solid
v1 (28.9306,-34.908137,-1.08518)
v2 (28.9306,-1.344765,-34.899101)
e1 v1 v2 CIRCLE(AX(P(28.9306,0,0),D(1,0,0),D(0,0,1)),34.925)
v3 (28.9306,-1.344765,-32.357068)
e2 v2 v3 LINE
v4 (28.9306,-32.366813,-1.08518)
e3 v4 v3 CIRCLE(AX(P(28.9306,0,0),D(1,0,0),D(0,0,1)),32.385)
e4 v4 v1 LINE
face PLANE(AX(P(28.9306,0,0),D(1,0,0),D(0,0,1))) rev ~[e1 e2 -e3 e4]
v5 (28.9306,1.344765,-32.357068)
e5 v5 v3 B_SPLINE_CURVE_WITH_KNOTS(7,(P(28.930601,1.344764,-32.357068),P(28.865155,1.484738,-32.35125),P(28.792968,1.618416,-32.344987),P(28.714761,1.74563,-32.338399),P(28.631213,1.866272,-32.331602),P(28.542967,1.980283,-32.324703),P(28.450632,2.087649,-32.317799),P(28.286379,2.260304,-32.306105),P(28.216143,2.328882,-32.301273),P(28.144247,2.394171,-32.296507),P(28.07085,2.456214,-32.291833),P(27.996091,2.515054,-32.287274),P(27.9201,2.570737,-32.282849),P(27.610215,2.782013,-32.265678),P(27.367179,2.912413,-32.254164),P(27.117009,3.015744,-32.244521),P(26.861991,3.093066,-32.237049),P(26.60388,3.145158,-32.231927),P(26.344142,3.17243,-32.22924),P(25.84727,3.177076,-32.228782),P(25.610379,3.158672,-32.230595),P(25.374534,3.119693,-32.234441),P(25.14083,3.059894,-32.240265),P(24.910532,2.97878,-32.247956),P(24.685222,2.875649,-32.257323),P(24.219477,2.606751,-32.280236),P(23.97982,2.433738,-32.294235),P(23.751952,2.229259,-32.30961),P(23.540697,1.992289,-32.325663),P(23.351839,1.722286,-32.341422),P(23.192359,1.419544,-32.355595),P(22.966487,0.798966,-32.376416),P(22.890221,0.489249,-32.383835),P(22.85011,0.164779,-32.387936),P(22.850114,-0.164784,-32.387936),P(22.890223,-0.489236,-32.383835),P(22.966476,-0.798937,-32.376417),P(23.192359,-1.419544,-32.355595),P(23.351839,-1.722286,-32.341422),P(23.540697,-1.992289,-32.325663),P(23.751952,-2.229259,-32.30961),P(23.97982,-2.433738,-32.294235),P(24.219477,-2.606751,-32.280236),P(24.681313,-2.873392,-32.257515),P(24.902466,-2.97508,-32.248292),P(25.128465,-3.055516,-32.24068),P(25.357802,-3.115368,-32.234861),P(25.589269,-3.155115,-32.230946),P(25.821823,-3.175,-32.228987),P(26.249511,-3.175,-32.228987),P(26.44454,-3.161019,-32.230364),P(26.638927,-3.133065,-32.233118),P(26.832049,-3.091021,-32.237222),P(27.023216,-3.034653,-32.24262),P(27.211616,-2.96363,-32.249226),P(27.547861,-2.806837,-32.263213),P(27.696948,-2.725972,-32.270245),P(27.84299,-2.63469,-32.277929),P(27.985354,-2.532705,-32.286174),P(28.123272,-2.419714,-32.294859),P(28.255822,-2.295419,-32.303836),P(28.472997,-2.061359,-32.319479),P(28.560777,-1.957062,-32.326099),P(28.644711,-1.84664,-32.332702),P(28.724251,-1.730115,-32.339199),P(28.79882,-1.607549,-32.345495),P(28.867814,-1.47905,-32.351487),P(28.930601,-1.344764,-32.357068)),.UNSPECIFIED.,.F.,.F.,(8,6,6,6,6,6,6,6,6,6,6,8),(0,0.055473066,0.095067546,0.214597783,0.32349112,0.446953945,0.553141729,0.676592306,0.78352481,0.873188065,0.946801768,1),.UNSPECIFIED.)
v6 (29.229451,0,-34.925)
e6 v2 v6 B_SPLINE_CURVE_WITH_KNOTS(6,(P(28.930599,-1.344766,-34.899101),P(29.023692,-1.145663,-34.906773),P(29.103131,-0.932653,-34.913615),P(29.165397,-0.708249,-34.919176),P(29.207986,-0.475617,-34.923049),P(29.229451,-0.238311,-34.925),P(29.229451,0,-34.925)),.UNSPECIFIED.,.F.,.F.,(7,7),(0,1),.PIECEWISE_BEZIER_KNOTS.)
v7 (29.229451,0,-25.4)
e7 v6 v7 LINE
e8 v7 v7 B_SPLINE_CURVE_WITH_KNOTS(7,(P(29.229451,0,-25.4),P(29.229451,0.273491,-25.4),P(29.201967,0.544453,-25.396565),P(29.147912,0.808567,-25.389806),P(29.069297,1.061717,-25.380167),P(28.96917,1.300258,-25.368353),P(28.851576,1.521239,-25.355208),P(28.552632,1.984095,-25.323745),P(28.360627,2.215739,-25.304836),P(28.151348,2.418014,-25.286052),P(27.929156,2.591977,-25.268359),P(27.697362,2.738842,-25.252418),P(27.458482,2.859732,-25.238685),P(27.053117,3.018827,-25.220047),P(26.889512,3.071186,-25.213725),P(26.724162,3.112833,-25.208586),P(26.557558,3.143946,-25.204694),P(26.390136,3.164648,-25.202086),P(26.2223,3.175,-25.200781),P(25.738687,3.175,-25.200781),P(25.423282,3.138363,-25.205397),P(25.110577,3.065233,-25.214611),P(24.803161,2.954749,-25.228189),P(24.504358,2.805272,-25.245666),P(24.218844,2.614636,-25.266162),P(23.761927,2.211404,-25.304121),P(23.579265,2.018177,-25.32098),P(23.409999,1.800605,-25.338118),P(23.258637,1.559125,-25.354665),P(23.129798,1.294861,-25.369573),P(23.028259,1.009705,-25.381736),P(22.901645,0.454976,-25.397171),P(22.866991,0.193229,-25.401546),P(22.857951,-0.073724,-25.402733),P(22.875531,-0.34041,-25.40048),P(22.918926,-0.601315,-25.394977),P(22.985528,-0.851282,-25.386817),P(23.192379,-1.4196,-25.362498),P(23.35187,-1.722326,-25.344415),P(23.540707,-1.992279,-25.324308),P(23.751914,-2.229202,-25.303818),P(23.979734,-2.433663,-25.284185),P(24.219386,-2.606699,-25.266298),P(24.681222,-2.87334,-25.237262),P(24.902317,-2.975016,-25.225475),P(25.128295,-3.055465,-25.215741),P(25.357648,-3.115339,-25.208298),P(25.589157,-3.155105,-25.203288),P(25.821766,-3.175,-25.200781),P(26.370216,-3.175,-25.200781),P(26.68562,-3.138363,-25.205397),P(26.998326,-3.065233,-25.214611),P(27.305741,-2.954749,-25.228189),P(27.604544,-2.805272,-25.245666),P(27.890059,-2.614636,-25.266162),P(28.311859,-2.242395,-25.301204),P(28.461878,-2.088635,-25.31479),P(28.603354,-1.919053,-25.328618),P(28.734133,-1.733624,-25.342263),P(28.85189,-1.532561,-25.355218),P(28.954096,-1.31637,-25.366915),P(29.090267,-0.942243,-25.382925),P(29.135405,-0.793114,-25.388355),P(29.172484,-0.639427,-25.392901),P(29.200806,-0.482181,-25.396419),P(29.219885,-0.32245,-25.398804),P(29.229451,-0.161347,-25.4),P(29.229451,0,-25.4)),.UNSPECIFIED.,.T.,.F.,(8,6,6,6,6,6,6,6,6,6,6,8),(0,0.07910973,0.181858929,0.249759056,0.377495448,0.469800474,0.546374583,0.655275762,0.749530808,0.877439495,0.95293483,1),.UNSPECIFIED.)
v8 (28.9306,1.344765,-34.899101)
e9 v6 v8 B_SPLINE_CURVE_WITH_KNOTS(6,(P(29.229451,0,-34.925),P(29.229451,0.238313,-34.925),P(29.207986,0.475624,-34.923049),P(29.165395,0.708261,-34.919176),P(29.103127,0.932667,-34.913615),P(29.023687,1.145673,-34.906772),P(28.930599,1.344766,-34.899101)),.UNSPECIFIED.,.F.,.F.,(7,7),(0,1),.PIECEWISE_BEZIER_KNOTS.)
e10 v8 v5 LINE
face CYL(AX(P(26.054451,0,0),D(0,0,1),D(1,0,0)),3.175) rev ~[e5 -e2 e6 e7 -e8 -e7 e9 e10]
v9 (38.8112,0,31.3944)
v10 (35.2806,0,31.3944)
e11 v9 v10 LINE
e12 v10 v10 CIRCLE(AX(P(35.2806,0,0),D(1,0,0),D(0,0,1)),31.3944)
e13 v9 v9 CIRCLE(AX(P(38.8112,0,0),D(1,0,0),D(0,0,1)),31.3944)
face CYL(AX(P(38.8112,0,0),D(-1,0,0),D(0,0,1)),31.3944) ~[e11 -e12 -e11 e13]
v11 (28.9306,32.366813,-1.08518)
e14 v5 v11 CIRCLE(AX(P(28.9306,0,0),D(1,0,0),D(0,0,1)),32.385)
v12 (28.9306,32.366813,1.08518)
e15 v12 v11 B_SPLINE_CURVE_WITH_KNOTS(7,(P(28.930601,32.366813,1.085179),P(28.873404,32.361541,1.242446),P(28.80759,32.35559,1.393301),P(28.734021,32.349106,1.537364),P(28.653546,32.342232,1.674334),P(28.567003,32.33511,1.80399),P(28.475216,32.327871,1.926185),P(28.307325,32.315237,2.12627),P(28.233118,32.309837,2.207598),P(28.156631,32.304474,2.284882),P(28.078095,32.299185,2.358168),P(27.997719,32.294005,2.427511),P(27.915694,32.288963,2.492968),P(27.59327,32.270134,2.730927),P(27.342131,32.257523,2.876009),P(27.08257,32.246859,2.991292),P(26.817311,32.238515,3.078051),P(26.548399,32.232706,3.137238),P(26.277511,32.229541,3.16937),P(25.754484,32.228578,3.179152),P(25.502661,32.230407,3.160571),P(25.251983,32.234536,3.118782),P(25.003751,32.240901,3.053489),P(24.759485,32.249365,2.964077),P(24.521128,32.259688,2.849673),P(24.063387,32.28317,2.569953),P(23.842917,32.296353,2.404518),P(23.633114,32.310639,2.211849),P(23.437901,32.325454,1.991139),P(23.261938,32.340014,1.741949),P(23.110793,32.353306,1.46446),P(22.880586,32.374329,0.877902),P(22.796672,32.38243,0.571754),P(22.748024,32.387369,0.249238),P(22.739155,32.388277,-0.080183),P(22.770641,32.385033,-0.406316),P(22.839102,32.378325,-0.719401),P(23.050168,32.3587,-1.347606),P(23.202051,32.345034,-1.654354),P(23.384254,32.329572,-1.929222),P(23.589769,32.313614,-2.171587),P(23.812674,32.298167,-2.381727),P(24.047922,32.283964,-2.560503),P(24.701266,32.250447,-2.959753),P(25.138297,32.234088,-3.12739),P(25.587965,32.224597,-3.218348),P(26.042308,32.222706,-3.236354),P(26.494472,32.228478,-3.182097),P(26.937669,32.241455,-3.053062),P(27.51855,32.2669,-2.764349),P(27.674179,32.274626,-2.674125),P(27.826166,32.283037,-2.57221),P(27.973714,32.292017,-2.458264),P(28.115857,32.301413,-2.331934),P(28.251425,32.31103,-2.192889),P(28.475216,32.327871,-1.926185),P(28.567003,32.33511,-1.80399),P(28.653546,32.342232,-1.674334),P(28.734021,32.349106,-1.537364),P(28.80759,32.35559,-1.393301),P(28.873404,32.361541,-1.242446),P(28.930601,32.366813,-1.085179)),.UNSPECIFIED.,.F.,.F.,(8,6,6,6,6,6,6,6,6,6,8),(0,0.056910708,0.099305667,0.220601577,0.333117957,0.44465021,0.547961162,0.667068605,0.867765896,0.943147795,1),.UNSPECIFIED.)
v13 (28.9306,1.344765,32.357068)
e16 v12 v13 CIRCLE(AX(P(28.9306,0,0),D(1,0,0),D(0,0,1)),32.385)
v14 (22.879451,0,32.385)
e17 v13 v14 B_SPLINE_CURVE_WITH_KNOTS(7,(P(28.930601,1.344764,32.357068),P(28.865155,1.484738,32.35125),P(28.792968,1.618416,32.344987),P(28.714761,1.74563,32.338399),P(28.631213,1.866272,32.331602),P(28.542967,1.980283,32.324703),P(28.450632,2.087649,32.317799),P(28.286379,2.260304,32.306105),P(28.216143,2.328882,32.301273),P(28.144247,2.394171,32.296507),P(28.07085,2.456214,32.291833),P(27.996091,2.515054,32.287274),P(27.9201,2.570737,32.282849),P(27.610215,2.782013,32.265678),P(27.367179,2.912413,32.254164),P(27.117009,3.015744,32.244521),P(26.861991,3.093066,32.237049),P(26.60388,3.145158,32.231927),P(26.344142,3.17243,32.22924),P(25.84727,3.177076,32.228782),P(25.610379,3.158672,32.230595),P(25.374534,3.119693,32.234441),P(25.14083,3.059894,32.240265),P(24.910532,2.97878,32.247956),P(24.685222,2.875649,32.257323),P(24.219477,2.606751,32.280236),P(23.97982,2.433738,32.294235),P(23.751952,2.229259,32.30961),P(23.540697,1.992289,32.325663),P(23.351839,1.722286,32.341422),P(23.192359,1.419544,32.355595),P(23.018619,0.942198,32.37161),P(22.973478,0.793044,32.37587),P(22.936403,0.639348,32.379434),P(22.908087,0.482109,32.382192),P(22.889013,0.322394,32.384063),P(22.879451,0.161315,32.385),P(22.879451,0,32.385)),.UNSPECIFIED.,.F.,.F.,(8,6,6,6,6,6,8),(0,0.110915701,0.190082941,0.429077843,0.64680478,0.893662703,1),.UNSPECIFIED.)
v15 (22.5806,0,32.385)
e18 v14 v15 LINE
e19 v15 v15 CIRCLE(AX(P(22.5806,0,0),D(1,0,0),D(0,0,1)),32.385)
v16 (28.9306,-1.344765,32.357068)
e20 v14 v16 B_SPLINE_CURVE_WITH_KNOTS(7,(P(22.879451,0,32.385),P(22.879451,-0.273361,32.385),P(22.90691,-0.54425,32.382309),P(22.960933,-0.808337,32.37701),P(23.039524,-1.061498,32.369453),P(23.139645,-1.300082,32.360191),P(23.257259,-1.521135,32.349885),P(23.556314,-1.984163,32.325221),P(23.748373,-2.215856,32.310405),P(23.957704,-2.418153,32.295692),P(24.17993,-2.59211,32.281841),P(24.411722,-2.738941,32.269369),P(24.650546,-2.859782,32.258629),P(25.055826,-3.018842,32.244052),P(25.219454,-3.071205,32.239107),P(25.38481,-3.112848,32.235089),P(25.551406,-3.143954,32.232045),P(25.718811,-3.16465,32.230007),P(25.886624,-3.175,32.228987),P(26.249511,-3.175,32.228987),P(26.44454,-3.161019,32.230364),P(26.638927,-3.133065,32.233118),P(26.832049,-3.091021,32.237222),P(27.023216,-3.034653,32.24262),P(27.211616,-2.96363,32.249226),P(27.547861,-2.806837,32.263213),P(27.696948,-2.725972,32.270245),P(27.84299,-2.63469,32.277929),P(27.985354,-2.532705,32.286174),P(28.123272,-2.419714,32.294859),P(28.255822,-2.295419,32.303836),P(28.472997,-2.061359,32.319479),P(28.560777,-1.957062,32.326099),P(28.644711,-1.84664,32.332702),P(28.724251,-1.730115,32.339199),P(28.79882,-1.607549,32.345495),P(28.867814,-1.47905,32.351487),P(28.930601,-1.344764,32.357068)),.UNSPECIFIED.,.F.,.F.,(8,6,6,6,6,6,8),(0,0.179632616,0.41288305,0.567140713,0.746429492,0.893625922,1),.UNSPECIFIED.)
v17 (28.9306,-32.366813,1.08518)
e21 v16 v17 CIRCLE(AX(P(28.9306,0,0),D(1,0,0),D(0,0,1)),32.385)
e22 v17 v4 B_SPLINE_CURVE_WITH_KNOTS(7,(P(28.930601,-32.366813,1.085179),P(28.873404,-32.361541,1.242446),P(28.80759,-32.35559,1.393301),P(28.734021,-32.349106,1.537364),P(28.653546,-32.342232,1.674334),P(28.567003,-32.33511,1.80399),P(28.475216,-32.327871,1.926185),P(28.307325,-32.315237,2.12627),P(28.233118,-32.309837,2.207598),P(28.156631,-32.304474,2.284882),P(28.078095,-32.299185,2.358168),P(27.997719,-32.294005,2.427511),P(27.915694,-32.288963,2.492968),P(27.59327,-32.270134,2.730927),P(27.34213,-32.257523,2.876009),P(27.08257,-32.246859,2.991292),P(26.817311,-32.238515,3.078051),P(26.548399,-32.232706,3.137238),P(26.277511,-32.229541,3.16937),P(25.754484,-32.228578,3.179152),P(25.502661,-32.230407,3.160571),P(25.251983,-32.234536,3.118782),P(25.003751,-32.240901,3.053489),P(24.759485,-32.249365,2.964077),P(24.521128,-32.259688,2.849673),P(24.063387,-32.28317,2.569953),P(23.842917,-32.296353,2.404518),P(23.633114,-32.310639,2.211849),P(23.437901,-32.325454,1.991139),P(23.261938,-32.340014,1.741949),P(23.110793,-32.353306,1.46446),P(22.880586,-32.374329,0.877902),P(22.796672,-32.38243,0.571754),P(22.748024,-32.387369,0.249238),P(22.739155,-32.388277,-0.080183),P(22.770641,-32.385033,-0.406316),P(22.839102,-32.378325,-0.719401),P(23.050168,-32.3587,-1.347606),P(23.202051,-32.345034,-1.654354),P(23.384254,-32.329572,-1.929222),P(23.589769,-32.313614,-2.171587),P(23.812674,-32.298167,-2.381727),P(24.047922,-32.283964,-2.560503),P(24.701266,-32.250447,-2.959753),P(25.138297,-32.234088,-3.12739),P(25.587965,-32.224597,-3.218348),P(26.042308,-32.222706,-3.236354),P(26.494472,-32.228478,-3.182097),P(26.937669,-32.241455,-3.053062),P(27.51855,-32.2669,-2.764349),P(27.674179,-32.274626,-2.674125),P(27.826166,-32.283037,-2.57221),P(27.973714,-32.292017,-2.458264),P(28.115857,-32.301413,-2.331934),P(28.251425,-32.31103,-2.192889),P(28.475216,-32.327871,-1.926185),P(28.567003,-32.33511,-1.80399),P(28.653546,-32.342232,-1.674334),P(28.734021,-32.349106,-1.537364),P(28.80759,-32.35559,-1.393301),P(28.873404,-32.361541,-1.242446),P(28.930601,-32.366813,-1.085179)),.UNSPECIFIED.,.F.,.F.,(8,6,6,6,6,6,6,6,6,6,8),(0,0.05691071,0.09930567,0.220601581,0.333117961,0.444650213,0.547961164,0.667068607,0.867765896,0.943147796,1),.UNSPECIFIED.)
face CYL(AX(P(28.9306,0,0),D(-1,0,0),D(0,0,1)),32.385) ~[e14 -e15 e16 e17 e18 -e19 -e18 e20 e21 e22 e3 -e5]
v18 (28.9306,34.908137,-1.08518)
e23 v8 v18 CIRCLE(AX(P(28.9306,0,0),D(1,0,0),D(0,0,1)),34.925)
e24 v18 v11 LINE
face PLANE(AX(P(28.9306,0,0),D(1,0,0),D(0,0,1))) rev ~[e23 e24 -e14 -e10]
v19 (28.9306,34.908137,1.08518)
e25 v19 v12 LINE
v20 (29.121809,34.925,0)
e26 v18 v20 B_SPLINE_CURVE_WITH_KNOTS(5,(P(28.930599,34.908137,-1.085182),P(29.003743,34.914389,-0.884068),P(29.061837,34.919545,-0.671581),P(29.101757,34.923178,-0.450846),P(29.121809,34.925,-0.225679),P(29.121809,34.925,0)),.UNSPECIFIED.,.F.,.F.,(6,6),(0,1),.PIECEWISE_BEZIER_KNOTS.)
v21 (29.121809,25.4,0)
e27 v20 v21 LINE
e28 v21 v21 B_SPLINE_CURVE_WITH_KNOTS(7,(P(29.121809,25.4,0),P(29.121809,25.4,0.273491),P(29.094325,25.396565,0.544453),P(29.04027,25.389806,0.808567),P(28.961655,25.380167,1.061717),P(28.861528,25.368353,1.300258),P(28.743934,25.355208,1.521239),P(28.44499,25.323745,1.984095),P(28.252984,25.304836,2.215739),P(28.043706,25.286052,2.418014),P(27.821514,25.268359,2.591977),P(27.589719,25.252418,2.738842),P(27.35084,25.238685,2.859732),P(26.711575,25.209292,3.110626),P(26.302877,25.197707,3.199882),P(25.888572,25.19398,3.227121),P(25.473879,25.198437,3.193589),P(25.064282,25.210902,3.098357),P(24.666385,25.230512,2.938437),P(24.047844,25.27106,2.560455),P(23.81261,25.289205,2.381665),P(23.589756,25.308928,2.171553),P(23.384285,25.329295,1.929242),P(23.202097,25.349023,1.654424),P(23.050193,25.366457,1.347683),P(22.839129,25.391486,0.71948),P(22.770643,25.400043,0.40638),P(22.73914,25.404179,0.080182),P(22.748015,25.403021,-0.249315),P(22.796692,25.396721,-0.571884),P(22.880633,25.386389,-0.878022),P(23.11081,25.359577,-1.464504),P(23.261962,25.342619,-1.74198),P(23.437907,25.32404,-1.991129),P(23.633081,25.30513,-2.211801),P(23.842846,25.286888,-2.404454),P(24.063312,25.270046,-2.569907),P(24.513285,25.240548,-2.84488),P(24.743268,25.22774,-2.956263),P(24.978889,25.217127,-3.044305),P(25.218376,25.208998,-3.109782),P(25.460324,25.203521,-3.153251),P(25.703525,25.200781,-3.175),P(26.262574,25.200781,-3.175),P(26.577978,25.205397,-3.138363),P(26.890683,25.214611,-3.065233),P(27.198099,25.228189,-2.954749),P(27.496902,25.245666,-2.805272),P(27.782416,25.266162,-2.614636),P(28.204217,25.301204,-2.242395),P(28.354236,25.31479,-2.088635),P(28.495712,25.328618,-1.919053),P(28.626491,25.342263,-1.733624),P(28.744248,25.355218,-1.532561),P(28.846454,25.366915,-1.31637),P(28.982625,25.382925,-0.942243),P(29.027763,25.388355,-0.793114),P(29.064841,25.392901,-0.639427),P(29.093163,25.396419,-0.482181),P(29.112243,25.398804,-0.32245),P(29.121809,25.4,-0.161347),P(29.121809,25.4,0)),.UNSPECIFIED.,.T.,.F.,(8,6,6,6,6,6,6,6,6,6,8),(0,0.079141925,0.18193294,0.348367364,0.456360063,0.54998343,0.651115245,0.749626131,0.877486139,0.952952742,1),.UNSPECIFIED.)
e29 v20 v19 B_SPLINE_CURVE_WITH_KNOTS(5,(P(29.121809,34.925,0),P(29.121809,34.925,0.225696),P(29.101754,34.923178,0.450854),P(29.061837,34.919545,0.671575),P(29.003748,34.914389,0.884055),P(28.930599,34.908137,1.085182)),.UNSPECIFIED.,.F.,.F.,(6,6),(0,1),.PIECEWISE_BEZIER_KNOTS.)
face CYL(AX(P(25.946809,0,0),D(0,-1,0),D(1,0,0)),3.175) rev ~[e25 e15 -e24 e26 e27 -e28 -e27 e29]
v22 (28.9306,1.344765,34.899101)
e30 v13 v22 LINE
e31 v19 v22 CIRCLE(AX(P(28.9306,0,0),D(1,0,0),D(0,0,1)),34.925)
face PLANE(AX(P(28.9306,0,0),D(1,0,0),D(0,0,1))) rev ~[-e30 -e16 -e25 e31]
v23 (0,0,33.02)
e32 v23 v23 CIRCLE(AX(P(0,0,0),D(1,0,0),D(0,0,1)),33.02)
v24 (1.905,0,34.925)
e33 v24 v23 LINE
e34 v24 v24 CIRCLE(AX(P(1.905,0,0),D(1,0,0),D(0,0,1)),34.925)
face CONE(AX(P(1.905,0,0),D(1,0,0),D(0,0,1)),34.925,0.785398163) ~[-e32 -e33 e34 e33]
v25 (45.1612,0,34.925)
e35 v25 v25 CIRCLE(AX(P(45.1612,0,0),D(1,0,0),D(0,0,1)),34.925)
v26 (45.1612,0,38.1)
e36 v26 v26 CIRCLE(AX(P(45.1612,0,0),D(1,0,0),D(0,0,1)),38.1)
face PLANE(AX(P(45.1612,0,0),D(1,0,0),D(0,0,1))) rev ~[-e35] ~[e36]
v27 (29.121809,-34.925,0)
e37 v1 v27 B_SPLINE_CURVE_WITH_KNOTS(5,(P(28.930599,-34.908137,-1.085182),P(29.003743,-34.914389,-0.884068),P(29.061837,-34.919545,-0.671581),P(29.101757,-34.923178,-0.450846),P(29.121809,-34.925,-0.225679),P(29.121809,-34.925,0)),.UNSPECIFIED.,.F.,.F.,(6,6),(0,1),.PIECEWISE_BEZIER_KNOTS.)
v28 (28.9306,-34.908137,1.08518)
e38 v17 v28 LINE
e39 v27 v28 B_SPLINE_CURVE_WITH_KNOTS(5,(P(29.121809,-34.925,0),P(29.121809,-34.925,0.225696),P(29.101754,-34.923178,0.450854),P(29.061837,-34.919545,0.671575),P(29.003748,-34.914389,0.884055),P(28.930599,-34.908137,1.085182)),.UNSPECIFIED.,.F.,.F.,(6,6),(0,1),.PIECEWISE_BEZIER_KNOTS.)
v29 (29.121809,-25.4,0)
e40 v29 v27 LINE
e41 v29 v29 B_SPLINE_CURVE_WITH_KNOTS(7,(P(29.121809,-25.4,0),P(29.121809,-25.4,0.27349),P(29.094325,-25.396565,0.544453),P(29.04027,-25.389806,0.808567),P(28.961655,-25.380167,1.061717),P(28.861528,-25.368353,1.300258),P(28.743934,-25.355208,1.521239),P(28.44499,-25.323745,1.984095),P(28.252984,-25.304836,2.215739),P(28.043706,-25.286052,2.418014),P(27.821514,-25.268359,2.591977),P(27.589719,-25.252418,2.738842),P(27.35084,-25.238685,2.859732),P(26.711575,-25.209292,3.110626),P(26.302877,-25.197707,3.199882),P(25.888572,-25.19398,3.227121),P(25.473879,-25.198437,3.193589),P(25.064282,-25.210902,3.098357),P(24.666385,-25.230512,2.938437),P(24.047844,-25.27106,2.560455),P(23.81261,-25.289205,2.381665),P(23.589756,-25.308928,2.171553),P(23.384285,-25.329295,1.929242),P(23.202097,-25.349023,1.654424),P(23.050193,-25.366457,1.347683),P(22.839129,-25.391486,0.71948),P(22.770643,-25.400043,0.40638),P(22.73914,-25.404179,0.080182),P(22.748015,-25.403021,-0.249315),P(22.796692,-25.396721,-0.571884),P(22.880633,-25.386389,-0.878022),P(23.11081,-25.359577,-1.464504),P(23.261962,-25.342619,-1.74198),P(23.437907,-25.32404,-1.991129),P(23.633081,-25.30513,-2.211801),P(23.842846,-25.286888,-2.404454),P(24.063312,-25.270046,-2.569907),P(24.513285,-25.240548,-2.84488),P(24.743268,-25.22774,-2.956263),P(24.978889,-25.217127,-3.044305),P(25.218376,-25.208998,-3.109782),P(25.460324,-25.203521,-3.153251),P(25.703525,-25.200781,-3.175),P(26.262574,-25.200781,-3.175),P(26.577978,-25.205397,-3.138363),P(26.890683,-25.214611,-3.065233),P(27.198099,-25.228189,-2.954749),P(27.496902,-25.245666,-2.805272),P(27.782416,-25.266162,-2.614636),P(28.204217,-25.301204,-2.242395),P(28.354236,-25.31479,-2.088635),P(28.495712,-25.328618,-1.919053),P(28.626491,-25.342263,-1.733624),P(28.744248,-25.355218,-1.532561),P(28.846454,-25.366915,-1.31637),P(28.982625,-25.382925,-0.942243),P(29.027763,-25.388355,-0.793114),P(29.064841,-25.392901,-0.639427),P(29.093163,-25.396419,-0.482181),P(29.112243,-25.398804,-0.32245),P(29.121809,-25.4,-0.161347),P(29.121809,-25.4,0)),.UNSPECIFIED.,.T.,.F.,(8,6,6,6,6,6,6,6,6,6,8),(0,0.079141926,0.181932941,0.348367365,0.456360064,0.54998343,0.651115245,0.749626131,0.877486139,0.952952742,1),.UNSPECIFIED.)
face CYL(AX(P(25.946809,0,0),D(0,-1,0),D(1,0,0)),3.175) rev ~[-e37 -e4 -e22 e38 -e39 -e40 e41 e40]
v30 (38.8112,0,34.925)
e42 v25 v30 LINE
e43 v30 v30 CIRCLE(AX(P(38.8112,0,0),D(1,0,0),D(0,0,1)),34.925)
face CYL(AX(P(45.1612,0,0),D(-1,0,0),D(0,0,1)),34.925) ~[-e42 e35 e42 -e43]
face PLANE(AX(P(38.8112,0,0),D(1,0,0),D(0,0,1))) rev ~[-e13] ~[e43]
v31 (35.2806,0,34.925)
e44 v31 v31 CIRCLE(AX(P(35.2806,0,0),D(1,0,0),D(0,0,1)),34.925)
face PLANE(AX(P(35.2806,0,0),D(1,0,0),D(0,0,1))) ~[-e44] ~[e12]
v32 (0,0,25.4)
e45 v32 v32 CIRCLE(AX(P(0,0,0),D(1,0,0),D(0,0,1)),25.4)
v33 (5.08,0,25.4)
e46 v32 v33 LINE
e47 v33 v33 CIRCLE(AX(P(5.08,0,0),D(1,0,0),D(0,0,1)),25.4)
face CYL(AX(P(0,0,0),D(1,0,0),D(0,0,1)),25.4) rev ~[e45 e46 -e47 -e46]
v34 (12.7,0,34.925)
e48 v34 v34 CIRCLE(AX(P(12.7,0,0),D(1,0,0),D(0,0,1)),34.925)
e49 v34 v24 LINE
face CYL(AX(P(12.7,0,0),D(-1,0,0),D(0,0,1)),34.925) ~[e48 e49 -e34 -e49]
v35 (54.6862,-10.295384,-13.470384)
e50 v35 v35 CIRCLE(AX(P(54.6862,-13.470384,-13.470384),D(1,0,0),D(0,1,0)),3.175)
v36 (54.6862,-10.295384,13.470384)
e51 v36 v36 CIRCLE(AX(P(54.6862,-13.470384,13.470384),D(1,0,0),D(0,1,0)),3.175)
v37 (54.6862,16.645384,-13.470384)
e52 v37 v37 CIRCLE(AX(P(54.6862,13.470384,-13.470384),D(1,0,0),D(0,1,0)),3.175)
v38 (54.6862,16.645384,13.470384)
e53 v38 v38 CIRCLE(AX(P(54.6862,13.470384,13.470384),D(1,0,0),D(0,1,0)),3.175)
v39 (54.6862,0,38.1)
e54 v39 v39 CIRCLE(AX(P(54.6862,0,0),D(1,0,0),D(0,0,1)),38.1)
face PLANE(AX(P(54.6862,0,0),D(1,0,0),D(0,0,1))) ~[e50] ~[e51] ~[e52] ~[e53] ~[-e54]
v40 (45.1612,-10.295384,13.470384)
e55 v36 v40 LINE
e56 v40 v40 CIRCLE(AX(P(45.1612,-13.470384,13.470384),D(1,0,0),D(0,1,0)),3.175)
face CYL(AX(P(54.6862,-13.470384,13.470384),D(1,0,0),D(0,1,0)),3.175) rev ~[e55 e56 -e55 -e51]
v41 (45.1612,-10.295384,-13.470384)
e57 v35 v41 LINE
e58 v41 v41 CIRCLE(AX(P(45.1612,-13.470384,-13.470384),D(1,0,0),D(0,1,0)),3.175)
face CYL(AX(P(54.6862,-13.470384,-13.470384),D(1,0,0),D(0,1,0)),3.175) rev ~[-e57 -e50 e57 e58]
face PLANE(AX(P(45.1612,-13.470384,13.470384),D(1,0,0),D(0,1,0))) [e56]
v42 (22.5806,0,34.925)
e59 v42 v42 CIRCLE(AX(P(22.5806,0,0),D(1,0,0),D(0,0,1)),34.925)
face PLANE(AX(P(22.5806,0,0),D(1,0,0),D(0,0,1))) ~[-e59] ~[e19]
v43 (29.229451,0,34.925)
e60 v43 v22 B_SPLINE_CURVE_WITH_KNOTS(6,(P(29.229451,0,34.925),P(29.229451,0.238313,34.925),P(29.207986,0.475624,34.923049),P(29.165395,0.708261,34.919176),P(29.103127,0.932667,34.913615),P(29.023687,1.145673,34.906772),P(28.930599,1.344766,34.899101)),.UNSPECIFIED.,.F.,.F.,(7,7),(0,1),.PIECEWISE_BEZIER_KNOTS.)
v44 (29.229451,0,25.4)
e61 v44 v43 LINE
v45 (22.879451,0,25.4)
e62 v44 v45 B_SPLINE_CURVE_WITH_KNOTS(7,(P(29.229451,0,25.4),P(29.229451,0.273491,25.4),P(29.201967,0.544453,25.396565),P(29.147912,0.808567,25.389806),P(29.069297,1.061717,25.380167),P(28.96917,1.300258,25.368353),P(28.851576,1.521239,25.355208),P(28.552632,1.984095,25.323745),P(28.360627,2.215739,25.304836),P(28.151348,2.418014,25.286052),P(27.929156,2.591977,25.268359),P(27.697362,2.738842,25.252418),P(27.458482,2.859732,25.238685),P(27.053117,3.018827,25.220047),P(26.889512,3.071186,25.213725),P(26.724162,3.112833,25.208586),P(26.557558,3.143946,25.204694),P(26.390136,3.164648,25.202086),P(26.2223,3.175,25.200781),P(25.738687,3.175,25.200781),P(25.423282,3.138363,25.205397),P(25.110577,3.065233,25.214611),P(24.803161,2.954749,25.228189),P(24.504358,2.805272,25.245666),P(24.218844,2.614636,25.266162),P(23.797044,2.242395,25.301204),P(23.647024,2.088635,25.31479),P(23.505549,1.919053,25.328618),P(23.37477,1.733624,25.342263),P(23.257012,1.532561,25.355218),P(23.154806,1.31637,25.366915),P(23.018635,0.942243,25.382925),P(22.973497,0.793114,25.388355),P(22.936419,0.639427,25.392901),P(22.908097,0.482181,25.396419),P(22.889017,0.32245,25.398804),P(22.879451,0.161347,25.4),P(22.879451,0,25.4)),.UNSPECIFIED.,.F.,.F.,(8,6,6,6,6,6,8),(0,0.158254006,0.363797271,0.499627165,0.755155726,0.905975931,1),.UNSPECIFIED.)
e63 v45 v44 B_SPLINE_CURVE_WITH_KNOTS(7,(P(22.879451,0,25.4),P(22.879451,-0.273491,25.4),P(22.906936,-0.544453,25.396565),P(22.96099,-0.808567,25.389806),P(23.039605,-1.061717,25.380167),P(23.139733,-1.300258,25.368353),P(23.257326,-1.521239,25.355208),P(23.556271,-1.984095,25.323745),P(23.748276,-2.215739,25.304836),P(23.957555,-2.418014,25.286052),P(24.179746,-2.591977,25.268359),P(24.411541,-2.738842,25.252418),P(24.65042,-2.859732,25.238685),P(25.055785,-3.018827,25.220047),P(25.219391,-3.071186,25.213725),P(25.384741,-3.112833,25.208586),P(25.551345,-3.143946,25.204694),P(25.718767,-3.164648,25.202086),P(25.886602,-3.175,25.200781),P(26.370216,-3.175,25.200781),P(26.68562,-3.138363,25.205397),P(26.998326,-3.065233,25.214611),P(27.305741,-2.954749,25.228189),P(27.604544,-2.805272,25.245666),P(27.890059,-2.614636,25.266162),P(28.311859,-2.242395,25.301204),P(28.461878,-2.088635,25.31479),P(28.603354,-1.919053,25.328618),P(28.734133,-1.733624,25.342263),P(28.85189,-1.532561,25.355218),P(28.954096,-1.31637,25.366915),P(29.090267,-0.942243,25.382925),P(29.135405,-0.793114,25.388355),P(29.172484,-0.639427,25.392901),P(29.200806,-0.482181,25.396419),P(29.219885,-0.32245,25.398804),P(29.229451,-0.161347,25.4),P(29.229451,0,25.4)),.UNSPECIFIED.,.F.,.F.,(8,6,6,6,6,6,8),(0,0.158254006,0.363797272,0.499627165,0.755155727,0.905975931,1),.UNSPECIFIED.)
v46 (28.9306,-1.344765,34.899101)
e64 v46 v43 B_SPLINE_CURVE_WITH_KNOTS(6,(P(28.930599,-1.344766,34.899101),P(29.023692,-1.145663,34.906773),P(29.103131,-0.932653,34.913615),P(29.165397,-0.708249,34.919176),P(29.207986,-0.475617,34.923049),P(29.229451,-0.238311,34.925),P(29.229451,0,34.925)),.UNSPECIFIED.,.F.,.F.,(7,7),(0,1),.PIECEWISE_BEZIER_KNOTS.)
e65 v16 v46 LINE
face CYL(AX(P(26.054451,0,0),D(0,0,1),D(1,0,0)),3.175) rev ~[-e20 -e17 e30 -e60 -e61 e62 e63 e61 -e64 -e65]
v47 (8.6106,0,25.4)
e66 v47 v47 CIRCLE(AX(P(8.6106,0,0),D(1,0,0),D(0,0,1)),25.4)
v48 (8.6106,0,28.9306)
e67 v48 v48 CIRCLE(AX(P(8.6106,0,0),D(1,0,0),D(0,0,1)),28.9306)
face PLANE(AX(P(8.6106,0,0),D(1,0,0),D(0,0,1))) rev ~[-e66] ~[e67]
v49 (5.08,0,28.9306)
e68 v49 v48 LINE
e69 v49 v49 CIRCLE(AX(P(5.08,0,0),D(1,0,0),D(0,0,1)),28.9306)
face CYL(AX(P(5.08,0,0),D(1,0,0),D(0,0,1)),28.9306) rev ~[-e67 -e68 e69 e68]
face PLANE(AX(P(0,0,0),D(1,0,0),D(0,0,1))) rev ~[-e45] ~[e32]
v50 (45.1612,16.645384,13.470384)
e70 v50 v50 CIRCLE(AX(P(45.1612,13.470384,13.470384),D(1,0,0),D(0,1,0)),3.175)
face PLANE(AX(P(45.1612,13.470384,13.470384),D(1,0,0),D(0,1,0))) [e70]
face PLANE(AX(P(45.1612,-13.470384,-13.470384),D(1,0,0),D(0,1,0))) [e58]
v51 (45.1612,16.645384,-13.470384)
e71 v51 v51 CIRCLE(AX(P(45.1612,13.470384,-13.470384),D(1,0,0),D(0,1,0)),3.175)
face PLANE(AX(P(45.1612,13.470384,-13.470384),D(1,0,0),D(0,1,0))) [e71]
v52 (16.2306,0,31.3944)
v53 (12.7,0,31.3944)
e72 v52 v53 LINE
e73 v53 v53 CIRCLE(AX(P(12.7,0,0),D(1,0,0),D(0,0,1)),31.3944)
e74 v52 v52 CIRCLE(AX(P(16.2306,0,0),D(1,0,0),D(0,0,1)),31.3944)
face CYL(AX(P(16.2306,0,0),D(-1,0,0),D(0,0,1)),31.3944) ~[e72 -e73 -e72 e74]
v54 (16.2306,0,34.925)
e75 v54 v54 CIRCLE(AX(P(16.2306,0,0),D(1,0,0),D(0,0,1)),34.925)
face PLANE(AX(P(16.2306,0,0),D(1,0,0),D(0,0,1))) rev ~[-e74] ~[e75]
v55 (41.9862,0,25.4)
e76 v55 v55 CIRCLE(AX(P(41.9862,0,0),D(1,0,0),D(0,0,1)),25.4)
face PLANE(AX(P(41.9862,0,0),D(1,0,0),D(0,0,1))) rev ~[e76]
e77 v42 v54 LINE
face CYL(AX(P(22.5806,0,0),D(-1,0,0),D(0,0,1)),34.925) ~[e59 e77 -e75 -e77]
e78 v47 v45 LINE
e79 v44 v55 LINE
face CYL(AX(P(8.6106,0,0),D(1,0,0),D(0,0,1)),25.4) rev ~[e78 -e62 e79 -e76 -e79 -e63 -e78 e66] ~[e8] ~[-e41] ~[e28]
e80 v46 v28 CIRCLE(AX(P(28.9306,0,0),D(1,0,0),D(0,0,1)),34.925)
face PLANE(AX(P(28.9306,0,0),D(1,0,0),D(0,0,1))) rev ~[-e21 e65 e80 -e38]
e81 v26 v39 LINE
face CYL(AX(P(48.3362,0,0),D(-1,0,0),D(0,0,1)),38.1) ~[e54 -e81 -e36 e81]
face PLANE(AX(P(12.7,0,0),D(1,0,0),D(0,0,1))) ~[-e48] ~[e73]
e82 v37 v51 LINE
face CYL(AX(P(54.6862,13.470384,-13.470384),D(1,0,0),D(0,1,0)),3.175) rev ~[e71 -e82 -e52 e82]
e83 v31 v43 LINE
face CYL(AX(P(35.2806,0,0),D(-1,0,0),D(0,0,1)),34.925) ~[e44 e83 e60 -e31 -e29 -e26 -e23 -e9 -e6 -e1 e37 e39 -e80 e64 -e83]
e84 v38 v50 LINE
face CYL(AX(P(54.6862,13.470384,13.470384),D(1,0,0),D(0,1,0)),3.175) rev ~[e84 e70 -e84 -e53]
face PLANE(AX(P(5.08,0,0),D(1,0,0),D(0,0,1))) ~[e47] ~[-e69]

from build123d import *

# Parameters (mm, degrees)
F2_R      = 3.175
F3_DEPTH  = 38.1
F4_R      = 3.175
F5_DEPTH  = 38.1
F7_DEPTH  = 6.35
F8_SIZE   = 1.905
F9_R      = 3.175
F10_DEPTH = 9.525


# Not quite as in the source:
# - a feature names something its author has since deleted; it is built from what else it names


with BuildPart() as f1:
    # F0 (on Front) → F1 (revolve)
    with BuildSketch(Plane.XZ):
        Polygon((41.9862, 25.4), (41.9862, 0), (48.3362, 0), (48.3362, 25.527), (48.3362, 38.1), (45.1612, 38.1), (45.1612, 34.925), (38.8112, 34.925), (38.8112, 31.3944), (35.2806, 31.3944), (35.2806, 34.925), (28.9306, 34.925), (28.9306, 32.385), (22.5806, 32.385), (22.5806, 34.925), (16.2306, 34.925), (16.2306, 31.3944), (12.7, 31.3944), (12.7, 34.925), (0, 34.925), (0, 25.4), (5.08, 25.4), (5.08, 28.9306), (8.6106, 28.9306), (8.6106, 25.4), align=None)
    revolve(axis=Axis((-0.433858484, 0, 0), (1, 0, 0)))

    # F2 (on Front) → F3 (cut, symmetric)
    with BuildSketch(Plane.XZ):
        with Locations((25.9468089789, 0)):
            Circle(F2_R)
    extrude(amount=F3_DEPTH, both=True, mode=Mode.SUBTRACT)

    # F4 (on Top) → F5 (cut, symmetric)
    with BuildSketch(Plane.XY):
        with Locations((26.0544512421, 0)):
            Circle(F4_R)
    extrude(amount=F5_DEPTH, both=True, mode=Mode.SUBTRACT)

    # F7 (add): a face of the model
    f7_faces = [f1.faces().sort_by_distance(p)[0] for p in [
        (48.3362, 0, 0),
    ]]
    extrude(f7_faces, amount=F7_DEPTH)

    # F8
    f8_edges = [f1.edges().sort_by_distance(p)[0] for p in [
        (0, 0, -34.925),
    ]]
    chamfer(f8_edges, length=F8_SIZE)

    # F9 (on face) → F10 (cut)
    with BuildSketch(Plane.YZ.offset(54.6862)):
        with Locations((13.4703841816, 13.4703841816)):
            Circle(F9_R)
        with Locations((13.4703841816, -13.4703841816)):
            Circle(F9_R)
        with Locations((-13.4703841816, -13.4703841816)):
            Circle(F9_R)
        with Locations((-13.4703841816, 13.4703841816)):
            Circle(F9_R)
    extrude(amount=-F10_DEPTH, mode=Mode.SUBTRACT)


solid = f1.part
